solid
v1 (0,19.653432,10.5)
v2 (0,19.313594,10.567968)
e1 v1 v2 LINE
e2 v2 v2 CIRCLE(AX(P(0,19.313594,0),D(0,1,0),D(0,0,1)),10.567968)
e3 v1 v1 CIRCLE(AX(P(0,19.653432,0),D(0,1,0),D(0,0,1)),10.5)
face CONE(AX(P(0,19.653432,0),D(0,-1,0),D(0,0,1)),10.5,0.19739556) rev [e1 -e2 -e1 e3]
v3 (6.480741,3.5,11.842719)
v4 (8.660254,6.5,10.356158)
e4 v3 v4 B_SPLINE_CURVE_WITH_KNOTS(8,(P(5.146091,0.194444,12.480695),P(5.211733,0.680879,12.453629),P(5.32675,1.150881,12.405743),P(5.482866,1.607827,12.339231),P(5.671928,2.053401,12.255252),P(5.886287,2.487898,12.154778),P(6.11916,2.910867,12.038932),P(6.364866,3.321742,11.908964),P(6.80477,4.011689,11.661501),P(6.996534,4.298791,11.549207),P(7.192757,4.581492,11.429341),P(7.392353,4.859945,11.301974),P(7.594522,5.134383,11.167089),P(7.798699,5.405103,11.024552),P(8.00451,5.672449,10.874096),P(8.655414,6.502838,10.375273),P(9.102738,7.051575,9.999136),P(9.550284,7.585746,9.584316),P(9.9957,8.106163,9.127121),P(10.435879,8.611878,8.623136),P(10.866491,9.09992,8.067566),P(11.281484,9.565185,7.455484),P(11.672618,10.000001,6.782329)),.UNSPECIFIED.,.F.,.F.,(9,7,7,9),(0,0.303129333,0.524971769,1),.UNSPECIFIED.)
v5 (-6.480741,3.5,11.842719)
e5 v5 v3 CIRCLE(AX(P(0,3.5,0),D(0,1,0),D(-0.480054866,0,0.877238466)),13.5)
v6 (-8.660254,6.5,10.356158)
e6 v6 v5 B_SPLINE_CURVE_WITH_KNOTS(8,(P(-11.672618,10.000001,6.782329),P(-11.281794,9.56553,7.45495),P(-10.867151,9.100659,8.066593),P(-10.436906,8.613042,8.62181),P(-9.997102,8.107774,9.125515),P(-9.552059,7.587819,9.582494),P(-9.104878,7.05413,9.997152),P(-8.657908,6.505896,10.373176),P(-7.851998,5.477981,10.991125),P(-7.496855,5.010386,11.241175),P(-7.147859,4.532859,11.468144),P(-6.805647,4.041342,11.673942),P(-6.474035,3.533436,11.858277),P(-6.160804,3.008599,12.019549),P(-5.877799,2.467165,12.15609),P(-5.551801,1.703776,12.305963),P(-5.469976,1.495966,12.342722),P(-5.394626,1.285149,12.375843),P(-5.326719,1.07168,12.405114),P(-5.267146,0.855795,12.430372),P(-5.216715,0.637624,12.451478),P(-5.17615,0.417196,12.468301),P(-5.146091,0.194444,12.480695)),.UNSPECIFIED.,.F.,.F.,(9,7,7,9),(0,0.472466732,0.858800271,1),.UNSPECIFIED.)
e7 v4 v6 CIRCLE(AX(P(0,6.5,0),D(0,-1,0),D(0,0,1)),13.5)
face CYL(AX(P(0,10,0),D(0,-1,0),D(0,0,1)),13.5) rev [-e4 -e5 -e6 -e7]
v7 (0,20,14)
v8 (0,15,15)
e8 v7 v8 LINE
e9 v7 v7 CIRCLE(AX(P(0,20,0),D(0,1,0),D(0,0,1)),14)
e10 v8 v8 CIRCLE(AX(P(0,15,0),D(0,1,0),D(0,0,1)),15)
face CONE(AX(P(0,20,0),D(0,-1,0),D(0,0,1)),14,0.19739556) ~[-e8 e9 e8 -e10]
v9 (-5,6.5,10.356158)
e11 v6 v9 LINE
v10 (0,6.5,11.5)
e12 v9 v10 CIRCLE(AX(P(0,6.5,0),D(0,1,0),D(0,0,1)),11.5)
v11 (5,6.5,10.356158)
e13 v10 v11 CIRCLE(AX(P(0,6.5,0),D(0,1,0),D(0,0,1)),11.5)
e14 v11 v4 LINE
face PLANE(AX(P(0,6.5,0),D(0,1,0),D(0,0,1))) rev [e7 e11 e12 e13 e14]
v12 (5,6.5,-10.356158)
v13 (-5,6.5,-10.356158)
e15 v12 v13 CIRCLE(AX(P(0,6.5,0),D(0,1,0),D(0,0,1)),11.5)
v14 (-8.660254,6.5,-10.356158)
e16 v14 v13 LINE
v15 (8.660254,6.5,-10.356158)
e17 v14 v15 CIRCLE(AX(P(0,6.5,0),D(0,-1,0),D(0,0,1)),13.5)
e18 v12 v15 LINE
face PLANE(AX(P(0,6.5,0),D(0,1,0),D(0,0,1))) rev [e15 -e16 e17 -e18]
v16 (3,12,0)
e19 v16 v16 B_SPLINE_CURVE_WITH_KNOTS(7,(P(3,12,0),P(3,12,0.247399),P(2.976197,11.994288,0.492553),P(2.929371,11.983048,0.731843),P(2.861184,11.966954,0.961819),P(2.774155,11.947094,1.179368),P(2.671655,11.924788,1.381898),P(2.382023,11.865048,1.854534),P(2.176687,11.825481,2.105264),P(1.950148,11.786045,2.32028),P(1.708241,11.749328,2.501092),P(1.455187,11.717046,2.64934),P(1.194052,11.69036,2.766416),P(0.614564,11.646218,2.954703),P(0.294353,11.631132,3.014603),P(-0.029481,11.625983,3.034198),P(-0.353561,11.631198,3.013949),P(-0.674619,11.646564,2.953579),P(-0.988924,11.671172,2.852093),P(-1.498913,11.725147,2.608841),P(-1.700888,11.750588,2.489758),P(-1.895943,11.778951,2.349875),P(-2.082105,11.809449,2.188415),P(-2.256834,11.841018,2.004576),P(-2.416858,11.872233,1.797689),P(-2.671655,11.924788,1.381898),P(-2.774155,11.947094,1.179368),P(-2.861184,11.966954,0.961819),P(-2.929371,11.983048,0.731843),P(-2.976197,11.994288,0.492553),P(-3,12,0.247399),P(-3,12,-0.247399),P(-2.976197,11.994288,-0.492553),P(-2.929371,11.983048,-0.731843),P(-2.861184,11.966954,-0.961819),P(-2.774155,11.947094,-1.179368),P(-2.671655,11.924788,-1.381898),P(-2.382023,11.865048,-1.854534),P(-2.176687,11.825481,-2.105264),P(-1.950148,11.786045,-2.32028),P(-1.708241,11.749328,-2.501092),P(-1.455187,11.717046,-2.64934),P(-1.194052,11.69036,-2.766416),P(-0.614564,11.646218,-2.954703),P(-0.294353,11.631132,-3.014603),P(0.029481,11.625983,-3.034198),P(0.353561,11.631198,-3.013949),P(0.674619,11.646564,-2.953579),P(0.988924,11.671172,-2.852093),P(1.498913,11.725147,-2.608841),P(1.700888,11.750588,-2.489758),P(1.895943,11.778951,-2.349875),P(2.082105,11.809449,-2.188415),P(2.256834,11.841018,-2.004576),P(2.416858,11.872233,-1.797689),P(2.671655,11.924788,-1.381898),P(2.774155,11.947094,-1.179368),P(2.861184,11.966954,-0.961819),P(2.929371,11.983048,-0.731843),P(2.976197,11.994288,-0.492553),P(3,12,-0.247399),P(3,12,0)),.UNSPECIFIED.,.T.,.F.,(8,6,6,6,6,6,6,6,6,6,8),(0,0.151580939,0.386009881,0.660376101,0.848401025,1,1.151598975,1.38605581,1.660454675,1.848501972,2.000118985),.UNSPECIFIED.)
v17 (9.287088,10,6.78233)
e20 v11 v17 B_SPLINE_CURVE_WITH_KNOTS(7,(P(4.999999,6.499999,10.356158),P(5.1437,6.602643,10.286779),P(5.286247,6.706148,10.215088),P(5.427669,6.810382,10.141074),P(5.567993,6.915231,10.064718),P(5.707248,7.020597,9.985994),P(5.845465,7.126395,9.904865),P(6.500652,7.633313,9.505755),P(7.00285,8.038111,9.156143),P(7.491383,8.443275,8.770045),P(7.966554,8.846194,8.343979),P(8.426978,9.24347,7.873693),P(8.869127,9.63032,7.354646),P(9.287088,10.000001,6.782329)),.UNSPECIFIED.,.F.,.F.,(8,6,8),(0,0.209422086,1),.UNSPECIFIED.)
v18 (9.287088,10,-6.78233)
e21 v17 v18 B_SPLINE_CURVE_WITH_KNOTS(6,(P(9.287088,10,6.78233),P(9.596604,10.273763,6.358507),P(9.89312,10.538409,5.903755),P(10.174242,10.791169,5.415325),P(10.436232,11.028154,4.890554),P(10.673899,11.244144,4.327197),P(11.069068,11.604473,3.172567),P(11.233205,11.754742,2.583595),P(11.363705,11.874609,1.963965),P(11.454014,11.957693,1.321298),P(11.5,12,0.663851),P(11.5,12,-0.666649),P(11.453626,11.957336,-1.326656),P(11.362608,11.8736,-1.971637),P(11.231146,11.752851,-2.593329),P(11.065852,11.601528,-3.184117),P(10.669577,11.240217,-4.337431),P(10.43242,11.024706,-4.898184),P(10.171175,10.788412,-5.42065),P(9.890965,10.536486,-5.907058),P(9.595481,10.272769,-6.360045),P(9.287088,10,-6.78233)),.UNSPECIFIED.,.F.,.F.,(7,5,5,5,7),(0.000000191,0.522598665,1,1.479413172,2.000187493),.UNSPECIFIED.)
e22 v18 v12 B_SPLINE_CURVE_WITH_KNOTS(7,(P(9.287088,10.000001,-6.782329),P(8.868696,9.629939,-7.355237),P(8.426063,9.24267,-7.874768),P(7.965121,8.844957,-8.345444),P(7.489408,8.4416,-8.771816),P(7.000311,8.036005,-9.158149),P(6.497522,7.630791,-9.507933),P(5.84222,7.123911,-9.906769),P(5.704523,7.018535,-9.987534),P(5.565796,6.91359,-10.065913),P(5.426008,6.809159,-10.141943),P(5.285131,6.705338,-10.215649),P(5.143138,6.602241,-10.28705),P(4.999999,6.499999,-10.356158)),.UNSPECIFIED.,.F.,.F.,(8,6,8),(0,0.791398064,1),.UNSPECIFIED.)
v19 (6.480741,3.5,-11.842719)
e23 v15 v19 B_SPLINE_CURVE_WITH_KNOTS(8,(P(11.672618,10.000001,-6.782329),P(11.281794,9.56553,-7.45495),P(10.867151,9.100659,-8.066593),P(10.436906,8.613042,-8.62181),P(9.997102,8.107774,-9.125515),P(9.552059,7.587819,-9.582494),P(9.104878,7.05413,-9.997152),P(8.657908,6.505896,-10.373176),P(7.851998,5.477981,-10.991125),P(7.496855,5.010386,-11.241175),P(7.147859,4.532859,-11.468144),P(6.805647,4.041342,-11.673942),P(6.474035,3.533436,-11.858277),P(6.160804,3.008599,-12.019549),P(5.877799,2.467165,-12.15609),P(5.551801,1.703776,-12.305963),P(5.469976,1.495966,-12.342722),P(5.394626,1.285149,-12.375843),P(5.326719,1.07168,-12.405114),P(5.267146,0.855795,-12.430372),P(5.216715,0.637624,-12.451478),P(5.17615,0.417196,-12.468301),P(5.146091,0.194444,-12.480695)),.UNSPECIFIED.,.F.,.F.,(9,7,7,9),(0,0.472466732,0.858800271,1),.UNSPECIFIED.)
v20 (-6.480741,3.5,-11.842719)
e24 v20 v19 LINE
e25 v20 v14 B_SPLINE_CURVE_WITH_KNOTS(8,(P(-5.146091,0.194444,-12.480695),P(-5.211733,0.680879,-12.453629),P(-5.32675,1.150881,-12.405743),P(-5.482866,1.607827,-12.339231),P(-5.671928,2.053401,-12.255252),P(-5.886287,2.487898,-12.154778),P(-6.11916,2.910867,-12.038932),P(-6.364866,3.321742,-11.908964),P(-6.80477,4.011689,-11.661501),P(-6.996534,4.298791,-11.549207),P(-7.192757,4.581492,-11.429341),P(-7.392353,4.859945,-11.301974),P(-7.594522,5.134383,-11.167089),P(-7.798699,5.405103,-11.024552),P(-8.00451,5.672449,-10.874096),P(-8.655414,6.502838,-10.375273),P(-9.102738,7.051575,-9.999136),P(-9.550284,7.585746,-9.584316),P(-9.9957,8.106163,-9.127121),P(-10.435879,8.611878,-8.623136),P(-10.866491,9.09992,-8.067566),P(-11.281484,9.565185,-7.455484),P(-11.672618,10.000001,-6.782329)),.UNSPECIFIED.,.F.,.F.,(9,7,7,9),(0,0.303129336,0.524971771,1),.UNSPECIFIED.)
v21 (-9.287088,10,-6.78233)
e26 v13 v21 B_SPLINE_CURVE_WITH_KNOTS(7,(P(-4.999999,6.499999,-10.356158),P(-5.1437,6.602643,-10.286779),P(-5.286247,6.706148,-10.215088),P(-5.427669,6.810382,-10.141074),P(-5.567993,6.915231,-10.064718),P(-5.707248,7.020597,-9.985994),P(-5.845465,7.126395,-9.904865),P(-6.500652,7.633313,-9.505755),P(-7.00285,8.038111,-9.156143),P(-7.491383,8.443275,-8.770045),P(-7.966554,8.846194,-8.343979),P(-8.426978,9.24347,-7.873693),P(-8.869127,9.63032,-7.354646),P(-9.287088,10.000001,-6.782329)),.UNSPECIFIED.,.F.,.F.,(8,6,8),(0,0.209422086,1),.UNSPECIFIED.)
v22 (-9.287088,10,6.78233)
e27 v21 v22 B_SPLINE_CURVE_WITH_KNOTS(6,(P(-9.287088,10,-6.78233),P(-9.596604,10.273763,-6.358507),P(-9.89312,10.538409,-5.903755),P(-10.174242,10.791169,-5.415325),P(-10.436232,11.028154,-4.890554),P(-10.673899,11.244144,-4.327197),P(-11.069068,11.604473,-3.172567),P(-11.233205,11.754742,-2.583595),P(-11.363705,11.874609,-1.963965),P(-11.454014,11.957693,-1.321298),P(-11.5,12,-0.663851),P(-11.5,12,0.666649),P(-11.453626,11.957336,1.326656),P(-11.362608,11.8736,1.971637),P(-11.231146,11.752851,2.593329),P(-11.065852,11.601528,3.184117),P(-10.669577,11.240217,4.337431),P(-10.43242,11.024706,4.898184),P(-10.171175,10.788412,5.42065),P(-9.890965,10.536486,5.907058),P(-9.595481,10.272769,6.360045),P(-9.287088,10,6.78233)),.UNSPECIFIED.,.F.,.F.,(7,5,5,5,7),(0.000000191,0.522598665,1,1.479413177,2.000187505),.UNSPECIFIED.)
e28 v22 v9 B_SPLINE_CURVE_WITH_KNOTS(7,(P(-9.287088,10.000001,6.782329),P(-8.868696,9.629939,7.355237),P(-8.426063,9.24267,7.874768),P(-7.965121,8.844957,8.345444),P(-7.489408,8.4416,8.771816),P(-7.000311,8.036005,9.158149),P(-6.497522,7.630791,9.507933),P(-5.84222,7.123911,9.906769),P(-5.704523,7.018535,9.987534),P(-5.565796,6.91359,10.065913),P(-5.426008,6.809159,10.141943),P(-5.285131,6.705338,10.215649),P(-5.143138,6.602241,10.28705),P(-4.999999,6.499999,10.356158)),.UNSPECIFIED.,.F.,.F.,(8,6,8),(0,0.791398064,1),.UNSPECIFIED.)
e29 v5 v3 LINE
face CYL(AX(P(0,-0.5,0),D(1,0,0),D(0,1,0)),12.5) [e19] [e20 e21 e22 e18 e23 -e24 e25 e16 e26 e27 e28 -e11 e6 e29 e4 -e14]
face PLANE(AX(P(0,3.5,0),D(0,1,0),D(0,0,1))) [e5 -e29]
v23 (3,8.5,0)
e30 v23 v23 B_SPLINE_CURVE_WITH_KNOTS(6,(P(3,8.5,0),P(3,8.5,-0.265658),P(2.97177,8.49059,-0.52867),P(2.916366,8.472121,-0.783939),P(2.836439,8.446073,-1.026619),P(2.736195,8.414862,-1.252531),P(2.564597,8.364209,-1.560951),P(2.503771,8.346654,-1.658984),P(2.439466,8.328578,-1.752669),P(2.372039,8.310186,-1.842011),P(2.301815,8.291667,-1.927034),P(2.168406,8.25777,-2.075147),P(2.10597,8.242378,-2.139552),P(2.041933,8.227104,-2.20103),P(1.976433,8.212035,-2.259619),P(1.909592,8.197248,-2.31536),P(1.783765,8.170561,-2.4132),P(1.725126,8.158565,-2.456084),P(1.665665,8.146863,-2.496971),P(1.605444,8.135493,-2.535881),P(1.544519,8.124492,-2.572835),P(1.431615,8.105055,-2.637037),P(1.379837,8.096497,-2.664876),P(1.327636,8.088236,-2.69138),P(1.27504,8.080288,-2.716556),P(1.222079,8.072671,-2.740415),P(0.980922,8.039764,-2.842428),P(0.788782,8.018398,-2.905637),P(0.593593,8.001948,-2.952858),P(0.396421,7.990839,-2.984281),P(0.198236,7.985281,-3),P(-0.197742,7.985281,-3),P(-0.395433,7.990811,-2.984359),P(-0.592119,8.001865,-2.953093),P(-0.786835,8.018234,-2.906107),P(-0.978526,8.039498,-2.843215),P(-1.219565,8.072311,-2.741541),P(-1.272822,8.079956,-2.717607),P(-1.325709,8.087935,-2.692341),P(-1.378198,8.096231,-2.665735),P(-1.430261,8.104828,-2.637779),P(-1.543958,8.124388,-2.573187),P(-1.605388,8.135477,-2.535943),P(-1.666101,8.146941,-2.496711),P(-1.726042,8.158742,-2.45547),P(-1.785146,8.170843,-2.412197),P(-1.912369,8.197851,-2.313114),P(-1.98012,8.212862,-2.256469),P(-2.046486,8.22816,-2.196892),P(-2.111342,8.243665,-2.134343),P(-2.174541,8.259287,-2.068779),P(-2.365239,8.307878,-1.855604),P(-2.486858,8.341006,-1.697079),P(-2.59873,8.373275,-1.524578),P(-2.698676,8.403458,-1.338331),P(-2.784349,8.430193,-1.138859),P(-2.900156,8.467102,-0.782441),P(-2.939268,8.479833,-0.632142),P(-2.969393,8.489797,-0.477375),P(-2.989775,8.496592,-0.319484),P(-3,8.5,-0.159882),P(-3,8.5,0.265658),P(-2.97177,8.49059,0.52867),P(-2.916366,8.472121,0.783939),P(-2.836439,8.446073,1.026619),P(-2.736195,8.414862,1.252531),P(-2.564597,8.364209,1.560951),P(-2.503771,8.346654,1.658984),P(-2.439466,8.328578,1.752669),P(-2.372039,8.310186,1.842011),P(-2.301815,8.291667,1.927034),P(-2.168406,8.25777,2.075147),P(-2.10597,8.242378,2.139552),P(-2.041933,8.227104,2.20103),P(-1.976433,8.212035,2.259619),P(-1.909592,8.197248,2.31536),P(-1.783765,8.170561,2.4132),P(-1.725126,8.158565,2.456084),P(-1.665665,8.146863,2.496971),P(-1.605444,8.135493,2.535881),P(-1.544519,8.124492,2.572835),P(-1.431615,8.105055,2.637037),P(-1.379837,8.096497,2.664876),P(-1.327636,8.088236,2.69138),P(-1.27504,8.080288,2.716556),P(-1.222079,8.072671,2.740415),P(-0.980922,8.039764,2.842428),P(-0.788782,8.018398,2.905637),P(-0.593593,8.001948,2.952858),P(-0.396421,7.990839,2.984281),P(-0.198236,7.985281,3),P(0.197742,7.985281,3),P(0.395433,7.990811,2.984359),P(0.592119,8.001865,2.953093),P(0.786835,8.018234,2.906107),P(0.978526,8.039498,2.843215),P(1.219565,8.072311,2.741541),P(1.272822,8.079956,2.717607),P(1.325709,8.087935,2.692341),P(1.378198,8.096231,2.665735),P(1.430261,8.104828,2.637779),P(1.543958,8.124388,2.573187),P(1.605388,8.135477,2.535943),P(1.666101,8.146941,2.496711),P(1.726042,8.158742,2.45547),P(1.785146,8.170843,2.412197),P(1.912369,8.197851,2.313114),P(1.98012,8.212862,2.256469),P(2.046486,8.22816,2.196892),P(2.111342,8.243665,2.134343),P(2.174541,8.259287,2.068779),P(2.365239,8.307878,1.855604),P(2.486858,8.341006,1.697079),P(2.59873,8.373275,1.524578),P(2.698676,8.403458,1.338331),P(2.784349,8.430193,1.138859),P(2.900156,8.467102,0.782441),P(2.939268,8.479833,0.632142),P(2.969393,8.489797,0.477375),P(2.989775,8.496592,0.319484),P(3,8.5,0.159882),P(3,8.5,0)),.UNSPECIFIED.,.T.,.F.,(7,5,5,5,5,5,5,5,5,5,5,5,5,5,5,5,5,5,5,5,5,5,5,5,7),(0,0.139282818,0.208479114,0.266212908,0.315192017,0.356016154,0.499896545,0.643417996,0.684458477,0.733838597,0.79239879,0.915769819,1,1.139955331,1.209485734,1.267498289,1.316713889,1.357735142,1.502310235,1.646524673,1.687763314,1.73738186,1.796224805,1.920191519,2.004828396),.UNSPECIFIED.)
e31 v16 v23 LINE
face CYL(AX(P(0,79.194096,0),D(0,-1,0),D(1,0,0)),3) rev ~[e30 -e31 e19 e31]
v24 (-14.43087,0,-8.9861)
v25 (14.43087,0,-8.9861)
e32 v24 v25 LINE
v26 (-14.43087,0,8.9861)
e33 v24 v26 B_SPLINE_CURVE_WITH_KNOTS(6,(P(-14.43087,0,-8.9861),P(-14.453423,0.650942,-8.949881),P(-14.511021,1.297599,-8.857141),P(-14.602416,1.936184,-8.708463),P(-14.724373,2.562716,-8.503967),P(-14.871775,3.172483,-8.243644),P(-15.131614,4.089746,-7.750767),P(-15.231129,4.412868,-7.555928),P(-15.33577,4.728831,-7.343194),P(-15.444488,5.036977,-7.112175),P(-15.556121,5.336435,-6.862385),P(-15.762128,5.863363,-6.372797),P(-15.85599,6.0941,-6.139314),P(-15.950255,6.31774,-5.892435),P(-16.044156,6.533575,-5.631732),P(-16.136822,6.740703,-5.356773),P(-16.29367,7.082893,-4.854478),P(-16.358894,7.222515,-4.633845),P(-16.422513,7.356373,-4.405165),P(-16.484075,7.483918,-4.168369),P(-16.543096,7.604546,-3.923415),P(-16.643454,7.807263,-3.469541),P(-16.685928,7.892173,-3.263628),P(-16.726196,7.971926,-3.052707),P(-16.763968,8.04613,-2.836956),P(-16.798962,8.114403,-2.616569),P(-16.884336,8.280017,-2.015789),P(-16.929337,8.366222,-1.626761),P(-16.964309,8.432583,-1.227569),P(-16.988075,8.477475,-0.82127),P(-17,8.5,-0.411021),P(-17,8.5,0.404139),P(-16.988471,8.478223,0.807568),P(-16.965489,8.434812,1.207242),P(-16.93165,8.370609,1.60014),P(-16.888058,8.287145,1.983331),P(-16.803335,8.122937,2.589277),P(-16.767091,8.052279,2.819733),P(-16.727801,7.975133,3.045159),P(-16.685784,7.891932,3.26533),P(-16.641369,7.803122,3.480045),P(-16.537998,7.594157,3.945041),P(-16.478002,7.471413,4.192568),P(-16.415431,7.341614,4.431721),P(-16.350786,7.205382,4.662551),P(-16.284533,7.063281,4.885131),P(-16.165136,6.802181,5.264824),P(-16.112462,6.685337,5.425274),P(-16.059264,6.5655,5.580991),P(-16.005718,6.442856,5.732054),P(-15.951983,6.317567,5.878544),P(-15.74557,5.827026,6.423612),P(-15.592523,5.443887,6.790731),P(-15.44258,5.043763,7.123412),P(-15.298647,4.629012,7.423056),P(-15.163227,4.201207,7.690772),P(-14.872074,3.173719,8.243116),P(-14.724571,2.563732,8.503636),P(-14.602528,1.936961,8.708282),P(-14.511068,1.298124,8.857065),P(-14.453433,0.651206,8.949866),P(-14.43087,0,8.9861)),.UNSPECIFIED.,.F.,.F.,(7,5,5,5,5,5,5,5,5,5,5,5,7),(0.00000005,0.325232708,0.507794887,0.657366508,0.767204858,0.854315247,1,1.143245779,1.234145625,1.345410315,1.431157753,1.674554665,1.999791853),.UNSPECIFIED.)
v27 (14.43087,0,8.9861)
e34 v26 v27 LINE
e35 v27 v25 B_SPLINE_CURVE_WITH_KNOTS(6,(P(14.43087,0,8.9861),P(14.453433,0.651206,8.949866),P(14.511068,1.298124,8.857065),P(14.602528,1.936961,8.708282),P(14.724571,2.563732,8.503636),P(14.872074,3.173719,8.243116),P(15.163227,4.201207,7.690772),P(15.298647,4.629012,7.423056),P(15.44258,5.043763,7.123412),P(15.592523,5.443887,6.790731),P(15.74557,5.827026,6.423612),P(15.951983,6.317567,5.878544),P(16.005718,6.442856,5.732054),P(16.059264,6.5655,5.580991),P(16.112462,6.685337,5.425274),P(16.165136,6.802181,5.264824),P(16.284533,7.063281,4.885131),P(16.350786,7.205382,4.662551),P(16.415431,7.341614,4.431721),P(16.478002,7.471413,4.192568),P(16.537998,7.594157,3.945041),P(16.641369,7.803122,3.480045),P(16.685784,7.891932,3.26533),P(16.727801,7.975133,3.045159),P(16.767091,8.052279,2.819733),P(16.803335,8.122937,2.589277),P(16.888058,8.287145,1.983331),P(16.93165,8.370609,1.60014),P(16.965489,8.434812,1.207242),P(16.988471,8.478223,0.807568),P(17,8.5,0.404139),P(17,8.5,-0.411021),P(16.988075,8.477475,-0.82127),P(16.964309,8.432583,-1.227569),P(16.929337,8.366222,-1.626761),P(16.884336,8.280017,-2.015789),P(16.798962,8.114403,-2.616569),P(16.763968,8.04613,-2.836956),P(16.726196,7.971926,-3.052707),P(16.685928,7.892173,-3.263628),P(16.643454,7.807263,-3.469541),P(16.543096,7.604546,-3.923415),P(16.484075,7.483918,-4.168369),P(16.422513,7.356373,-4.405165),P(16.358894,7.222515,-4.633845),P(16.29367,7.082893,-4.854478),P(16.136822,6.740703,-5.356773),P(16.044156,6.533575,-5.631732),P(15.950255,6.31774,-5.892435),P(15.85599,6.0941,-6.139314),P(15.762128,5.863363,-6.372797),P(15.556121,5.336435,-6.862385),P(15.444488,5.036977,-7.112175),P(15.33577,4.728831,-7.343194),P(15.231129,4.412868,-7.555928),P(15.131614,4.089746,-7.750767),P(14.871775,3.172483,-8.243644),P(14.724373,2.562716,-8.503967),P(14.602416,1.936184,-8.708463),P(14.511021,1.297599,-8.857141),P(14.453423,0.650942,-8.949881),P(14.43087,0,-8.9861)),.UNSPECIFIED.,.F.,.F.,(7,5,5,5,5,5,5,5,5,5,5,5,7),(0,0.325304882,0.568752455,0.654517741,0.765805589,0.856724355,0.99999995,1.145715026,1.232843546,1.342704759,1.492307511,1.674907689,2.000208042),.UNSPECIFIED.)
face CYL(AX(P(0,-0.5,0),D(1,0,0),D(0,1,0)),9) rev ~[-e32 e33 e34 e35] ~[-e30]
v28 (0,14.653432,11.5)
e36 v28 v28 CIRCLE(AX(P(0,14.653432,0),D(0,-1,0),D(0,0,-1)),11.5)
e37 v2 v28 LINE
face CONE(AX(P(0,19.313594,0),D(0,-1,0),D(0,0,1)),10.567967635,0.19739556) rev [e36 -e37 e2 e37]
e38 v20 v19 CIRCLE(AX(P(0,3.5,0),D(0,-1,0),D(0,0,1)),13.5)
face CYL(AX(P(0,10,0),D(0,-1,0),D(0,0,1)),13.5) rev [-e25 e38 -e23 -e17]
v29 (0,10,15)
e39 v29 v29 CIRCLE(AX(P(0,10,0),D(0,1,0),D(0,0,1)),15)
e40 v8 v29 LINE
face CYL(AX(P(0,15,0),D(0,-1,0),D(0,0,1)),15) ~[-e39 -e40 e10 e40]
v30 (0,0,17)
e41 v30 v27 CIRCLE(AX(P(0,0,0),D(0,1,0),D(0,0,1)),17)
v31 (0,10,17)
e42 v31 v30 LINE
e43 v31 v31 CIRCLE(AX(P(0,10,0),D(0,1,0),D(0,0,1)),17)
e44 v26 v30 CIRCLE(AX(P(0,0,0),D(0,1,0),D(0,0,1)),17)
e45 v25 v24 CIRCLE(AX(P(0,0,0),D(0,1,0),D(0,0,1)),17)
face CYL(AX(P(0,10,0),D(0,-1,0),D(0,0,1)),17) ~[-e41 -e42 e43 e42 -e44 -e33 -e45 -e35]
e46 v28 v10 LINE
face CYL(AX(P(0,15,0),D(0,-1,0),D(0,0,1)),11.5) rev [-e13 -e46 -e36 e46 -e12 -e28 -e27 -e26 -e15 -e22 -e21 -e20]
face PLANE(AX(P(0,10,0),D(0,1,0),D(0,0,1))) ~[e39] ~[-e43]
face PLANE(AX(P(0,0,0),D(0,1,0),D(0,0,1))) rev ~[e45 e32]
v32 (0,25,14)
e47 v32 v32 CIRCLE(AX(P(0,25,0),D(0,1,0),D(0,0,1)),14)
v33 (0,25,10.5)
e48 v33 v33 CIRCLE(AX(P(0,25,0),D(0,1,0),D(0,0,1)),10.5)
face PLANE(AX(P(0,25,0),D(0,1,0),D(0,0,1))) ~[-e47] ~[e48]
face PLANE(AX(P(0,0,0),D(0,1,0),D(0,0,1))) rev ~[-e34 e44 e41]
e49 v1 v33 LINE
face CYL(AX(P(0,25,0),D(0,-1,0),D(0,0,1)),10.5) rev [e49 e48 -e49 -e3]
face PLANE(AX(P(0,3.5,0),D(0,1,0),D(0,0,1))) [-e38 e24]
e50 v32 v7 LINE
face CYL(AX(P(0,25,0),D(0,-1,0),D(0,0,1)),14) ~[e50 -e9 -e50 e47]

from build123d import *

# Parameters (mm, degrees)
F2_R     = 9
F3_DEPTH = 25
F5_T     = 3.5
F6_D     = 6


# Not quite as in the source:
# - a shell that OpenCascade refuses in one call is made with other operations: the cavity is built on its own and cut out


with BuildPart() as f1:
    # F0 (on Right) → F1 (revolve)
    with BuildSketch(Plane.YZ):
        Polygon((0, 0), (25, 0), (25, 14), (20, 14), (15, 15), (10, 15), (10, 17), (0, 17), align=None)
    revolve(axis=Axis((0, 12.5, 0), (0, 1, 0)))

    # F2 (on Right) → F3 (cut, symmetric)
    with BuildSketch(Plane.YZ):
        with Locations((-0.5, 0)):
            Circle(F2_R)
    extrude(amount=F3_DEPTH, both=True, mode=Mode.SUBTRACT)

    # F5: shell of thickness 3.5, made by hand


with BuildPart() as f5_core1:
    # F5_t2: copy of F1
    add(f1.part)

    # the walls: a layer under each face that stays
    f5_faces = [f5_core1.faces().sort_by_distance(p)[0] for p in [
        (0, 22.5, -14),
        (0, 17.5, -14.5),
        (0, 12.5, -15),
        (-11.3333333333, 10, 11.3333333333),
        (0, 5, -17),
        (0, 0, -12.9930501889),
        (0, 8.5, 0),
        (0, 0, 12.9930501889),
    ]]
    thicken(f5_faces, amount=-F5_T, mode=Mode.SUBTRACT)

    # F5_s3 → F5_t4 (revolve, cut)
    with BuildSketch(Plane.YZ):
        Polygon((20.0068640647, 14.0693203236), (20, 10.5), (19.6534317024, 10.5), (19.313593527, 10.5679676351), align=None)
    revolve(axis=Axis((0, 20, 0), (0, 1, 0)), mode=Mode.SUBTRACT)

    # F5_s5 → F5_t6 (revolve, cut)
    with BuildSketch(Plane.YZ):
        Polygon((10.035, 15.035), (10, 11.5), (6.5, 11.5), (6.5, 15), align=None)
    revolve(axis=Axis((0, 10, 0), (0, 1, 0)), mode=Mode.SUBTRACT)


with BuildPart() as f1_1:
    add(f1.part)

    # what is left inside the walls is the cavity
    f5_cavity = [f5_core1.part.solids().sort_by_distance(p)[0] for p in [
        (-3.834029, 12.035, 0),
    ]]
    add(f5_cavity, mode=Mode.SUBTRACT)

    # F6 (through all)
    with Locations(Plane(origin=(0, 25, 0), x_dir=(-1, 0, 0), z_dir=(0, 1, 0))):
        with Locations((0, 0)):
            Hole(F6_D / 2)


solid = f1_1.part
